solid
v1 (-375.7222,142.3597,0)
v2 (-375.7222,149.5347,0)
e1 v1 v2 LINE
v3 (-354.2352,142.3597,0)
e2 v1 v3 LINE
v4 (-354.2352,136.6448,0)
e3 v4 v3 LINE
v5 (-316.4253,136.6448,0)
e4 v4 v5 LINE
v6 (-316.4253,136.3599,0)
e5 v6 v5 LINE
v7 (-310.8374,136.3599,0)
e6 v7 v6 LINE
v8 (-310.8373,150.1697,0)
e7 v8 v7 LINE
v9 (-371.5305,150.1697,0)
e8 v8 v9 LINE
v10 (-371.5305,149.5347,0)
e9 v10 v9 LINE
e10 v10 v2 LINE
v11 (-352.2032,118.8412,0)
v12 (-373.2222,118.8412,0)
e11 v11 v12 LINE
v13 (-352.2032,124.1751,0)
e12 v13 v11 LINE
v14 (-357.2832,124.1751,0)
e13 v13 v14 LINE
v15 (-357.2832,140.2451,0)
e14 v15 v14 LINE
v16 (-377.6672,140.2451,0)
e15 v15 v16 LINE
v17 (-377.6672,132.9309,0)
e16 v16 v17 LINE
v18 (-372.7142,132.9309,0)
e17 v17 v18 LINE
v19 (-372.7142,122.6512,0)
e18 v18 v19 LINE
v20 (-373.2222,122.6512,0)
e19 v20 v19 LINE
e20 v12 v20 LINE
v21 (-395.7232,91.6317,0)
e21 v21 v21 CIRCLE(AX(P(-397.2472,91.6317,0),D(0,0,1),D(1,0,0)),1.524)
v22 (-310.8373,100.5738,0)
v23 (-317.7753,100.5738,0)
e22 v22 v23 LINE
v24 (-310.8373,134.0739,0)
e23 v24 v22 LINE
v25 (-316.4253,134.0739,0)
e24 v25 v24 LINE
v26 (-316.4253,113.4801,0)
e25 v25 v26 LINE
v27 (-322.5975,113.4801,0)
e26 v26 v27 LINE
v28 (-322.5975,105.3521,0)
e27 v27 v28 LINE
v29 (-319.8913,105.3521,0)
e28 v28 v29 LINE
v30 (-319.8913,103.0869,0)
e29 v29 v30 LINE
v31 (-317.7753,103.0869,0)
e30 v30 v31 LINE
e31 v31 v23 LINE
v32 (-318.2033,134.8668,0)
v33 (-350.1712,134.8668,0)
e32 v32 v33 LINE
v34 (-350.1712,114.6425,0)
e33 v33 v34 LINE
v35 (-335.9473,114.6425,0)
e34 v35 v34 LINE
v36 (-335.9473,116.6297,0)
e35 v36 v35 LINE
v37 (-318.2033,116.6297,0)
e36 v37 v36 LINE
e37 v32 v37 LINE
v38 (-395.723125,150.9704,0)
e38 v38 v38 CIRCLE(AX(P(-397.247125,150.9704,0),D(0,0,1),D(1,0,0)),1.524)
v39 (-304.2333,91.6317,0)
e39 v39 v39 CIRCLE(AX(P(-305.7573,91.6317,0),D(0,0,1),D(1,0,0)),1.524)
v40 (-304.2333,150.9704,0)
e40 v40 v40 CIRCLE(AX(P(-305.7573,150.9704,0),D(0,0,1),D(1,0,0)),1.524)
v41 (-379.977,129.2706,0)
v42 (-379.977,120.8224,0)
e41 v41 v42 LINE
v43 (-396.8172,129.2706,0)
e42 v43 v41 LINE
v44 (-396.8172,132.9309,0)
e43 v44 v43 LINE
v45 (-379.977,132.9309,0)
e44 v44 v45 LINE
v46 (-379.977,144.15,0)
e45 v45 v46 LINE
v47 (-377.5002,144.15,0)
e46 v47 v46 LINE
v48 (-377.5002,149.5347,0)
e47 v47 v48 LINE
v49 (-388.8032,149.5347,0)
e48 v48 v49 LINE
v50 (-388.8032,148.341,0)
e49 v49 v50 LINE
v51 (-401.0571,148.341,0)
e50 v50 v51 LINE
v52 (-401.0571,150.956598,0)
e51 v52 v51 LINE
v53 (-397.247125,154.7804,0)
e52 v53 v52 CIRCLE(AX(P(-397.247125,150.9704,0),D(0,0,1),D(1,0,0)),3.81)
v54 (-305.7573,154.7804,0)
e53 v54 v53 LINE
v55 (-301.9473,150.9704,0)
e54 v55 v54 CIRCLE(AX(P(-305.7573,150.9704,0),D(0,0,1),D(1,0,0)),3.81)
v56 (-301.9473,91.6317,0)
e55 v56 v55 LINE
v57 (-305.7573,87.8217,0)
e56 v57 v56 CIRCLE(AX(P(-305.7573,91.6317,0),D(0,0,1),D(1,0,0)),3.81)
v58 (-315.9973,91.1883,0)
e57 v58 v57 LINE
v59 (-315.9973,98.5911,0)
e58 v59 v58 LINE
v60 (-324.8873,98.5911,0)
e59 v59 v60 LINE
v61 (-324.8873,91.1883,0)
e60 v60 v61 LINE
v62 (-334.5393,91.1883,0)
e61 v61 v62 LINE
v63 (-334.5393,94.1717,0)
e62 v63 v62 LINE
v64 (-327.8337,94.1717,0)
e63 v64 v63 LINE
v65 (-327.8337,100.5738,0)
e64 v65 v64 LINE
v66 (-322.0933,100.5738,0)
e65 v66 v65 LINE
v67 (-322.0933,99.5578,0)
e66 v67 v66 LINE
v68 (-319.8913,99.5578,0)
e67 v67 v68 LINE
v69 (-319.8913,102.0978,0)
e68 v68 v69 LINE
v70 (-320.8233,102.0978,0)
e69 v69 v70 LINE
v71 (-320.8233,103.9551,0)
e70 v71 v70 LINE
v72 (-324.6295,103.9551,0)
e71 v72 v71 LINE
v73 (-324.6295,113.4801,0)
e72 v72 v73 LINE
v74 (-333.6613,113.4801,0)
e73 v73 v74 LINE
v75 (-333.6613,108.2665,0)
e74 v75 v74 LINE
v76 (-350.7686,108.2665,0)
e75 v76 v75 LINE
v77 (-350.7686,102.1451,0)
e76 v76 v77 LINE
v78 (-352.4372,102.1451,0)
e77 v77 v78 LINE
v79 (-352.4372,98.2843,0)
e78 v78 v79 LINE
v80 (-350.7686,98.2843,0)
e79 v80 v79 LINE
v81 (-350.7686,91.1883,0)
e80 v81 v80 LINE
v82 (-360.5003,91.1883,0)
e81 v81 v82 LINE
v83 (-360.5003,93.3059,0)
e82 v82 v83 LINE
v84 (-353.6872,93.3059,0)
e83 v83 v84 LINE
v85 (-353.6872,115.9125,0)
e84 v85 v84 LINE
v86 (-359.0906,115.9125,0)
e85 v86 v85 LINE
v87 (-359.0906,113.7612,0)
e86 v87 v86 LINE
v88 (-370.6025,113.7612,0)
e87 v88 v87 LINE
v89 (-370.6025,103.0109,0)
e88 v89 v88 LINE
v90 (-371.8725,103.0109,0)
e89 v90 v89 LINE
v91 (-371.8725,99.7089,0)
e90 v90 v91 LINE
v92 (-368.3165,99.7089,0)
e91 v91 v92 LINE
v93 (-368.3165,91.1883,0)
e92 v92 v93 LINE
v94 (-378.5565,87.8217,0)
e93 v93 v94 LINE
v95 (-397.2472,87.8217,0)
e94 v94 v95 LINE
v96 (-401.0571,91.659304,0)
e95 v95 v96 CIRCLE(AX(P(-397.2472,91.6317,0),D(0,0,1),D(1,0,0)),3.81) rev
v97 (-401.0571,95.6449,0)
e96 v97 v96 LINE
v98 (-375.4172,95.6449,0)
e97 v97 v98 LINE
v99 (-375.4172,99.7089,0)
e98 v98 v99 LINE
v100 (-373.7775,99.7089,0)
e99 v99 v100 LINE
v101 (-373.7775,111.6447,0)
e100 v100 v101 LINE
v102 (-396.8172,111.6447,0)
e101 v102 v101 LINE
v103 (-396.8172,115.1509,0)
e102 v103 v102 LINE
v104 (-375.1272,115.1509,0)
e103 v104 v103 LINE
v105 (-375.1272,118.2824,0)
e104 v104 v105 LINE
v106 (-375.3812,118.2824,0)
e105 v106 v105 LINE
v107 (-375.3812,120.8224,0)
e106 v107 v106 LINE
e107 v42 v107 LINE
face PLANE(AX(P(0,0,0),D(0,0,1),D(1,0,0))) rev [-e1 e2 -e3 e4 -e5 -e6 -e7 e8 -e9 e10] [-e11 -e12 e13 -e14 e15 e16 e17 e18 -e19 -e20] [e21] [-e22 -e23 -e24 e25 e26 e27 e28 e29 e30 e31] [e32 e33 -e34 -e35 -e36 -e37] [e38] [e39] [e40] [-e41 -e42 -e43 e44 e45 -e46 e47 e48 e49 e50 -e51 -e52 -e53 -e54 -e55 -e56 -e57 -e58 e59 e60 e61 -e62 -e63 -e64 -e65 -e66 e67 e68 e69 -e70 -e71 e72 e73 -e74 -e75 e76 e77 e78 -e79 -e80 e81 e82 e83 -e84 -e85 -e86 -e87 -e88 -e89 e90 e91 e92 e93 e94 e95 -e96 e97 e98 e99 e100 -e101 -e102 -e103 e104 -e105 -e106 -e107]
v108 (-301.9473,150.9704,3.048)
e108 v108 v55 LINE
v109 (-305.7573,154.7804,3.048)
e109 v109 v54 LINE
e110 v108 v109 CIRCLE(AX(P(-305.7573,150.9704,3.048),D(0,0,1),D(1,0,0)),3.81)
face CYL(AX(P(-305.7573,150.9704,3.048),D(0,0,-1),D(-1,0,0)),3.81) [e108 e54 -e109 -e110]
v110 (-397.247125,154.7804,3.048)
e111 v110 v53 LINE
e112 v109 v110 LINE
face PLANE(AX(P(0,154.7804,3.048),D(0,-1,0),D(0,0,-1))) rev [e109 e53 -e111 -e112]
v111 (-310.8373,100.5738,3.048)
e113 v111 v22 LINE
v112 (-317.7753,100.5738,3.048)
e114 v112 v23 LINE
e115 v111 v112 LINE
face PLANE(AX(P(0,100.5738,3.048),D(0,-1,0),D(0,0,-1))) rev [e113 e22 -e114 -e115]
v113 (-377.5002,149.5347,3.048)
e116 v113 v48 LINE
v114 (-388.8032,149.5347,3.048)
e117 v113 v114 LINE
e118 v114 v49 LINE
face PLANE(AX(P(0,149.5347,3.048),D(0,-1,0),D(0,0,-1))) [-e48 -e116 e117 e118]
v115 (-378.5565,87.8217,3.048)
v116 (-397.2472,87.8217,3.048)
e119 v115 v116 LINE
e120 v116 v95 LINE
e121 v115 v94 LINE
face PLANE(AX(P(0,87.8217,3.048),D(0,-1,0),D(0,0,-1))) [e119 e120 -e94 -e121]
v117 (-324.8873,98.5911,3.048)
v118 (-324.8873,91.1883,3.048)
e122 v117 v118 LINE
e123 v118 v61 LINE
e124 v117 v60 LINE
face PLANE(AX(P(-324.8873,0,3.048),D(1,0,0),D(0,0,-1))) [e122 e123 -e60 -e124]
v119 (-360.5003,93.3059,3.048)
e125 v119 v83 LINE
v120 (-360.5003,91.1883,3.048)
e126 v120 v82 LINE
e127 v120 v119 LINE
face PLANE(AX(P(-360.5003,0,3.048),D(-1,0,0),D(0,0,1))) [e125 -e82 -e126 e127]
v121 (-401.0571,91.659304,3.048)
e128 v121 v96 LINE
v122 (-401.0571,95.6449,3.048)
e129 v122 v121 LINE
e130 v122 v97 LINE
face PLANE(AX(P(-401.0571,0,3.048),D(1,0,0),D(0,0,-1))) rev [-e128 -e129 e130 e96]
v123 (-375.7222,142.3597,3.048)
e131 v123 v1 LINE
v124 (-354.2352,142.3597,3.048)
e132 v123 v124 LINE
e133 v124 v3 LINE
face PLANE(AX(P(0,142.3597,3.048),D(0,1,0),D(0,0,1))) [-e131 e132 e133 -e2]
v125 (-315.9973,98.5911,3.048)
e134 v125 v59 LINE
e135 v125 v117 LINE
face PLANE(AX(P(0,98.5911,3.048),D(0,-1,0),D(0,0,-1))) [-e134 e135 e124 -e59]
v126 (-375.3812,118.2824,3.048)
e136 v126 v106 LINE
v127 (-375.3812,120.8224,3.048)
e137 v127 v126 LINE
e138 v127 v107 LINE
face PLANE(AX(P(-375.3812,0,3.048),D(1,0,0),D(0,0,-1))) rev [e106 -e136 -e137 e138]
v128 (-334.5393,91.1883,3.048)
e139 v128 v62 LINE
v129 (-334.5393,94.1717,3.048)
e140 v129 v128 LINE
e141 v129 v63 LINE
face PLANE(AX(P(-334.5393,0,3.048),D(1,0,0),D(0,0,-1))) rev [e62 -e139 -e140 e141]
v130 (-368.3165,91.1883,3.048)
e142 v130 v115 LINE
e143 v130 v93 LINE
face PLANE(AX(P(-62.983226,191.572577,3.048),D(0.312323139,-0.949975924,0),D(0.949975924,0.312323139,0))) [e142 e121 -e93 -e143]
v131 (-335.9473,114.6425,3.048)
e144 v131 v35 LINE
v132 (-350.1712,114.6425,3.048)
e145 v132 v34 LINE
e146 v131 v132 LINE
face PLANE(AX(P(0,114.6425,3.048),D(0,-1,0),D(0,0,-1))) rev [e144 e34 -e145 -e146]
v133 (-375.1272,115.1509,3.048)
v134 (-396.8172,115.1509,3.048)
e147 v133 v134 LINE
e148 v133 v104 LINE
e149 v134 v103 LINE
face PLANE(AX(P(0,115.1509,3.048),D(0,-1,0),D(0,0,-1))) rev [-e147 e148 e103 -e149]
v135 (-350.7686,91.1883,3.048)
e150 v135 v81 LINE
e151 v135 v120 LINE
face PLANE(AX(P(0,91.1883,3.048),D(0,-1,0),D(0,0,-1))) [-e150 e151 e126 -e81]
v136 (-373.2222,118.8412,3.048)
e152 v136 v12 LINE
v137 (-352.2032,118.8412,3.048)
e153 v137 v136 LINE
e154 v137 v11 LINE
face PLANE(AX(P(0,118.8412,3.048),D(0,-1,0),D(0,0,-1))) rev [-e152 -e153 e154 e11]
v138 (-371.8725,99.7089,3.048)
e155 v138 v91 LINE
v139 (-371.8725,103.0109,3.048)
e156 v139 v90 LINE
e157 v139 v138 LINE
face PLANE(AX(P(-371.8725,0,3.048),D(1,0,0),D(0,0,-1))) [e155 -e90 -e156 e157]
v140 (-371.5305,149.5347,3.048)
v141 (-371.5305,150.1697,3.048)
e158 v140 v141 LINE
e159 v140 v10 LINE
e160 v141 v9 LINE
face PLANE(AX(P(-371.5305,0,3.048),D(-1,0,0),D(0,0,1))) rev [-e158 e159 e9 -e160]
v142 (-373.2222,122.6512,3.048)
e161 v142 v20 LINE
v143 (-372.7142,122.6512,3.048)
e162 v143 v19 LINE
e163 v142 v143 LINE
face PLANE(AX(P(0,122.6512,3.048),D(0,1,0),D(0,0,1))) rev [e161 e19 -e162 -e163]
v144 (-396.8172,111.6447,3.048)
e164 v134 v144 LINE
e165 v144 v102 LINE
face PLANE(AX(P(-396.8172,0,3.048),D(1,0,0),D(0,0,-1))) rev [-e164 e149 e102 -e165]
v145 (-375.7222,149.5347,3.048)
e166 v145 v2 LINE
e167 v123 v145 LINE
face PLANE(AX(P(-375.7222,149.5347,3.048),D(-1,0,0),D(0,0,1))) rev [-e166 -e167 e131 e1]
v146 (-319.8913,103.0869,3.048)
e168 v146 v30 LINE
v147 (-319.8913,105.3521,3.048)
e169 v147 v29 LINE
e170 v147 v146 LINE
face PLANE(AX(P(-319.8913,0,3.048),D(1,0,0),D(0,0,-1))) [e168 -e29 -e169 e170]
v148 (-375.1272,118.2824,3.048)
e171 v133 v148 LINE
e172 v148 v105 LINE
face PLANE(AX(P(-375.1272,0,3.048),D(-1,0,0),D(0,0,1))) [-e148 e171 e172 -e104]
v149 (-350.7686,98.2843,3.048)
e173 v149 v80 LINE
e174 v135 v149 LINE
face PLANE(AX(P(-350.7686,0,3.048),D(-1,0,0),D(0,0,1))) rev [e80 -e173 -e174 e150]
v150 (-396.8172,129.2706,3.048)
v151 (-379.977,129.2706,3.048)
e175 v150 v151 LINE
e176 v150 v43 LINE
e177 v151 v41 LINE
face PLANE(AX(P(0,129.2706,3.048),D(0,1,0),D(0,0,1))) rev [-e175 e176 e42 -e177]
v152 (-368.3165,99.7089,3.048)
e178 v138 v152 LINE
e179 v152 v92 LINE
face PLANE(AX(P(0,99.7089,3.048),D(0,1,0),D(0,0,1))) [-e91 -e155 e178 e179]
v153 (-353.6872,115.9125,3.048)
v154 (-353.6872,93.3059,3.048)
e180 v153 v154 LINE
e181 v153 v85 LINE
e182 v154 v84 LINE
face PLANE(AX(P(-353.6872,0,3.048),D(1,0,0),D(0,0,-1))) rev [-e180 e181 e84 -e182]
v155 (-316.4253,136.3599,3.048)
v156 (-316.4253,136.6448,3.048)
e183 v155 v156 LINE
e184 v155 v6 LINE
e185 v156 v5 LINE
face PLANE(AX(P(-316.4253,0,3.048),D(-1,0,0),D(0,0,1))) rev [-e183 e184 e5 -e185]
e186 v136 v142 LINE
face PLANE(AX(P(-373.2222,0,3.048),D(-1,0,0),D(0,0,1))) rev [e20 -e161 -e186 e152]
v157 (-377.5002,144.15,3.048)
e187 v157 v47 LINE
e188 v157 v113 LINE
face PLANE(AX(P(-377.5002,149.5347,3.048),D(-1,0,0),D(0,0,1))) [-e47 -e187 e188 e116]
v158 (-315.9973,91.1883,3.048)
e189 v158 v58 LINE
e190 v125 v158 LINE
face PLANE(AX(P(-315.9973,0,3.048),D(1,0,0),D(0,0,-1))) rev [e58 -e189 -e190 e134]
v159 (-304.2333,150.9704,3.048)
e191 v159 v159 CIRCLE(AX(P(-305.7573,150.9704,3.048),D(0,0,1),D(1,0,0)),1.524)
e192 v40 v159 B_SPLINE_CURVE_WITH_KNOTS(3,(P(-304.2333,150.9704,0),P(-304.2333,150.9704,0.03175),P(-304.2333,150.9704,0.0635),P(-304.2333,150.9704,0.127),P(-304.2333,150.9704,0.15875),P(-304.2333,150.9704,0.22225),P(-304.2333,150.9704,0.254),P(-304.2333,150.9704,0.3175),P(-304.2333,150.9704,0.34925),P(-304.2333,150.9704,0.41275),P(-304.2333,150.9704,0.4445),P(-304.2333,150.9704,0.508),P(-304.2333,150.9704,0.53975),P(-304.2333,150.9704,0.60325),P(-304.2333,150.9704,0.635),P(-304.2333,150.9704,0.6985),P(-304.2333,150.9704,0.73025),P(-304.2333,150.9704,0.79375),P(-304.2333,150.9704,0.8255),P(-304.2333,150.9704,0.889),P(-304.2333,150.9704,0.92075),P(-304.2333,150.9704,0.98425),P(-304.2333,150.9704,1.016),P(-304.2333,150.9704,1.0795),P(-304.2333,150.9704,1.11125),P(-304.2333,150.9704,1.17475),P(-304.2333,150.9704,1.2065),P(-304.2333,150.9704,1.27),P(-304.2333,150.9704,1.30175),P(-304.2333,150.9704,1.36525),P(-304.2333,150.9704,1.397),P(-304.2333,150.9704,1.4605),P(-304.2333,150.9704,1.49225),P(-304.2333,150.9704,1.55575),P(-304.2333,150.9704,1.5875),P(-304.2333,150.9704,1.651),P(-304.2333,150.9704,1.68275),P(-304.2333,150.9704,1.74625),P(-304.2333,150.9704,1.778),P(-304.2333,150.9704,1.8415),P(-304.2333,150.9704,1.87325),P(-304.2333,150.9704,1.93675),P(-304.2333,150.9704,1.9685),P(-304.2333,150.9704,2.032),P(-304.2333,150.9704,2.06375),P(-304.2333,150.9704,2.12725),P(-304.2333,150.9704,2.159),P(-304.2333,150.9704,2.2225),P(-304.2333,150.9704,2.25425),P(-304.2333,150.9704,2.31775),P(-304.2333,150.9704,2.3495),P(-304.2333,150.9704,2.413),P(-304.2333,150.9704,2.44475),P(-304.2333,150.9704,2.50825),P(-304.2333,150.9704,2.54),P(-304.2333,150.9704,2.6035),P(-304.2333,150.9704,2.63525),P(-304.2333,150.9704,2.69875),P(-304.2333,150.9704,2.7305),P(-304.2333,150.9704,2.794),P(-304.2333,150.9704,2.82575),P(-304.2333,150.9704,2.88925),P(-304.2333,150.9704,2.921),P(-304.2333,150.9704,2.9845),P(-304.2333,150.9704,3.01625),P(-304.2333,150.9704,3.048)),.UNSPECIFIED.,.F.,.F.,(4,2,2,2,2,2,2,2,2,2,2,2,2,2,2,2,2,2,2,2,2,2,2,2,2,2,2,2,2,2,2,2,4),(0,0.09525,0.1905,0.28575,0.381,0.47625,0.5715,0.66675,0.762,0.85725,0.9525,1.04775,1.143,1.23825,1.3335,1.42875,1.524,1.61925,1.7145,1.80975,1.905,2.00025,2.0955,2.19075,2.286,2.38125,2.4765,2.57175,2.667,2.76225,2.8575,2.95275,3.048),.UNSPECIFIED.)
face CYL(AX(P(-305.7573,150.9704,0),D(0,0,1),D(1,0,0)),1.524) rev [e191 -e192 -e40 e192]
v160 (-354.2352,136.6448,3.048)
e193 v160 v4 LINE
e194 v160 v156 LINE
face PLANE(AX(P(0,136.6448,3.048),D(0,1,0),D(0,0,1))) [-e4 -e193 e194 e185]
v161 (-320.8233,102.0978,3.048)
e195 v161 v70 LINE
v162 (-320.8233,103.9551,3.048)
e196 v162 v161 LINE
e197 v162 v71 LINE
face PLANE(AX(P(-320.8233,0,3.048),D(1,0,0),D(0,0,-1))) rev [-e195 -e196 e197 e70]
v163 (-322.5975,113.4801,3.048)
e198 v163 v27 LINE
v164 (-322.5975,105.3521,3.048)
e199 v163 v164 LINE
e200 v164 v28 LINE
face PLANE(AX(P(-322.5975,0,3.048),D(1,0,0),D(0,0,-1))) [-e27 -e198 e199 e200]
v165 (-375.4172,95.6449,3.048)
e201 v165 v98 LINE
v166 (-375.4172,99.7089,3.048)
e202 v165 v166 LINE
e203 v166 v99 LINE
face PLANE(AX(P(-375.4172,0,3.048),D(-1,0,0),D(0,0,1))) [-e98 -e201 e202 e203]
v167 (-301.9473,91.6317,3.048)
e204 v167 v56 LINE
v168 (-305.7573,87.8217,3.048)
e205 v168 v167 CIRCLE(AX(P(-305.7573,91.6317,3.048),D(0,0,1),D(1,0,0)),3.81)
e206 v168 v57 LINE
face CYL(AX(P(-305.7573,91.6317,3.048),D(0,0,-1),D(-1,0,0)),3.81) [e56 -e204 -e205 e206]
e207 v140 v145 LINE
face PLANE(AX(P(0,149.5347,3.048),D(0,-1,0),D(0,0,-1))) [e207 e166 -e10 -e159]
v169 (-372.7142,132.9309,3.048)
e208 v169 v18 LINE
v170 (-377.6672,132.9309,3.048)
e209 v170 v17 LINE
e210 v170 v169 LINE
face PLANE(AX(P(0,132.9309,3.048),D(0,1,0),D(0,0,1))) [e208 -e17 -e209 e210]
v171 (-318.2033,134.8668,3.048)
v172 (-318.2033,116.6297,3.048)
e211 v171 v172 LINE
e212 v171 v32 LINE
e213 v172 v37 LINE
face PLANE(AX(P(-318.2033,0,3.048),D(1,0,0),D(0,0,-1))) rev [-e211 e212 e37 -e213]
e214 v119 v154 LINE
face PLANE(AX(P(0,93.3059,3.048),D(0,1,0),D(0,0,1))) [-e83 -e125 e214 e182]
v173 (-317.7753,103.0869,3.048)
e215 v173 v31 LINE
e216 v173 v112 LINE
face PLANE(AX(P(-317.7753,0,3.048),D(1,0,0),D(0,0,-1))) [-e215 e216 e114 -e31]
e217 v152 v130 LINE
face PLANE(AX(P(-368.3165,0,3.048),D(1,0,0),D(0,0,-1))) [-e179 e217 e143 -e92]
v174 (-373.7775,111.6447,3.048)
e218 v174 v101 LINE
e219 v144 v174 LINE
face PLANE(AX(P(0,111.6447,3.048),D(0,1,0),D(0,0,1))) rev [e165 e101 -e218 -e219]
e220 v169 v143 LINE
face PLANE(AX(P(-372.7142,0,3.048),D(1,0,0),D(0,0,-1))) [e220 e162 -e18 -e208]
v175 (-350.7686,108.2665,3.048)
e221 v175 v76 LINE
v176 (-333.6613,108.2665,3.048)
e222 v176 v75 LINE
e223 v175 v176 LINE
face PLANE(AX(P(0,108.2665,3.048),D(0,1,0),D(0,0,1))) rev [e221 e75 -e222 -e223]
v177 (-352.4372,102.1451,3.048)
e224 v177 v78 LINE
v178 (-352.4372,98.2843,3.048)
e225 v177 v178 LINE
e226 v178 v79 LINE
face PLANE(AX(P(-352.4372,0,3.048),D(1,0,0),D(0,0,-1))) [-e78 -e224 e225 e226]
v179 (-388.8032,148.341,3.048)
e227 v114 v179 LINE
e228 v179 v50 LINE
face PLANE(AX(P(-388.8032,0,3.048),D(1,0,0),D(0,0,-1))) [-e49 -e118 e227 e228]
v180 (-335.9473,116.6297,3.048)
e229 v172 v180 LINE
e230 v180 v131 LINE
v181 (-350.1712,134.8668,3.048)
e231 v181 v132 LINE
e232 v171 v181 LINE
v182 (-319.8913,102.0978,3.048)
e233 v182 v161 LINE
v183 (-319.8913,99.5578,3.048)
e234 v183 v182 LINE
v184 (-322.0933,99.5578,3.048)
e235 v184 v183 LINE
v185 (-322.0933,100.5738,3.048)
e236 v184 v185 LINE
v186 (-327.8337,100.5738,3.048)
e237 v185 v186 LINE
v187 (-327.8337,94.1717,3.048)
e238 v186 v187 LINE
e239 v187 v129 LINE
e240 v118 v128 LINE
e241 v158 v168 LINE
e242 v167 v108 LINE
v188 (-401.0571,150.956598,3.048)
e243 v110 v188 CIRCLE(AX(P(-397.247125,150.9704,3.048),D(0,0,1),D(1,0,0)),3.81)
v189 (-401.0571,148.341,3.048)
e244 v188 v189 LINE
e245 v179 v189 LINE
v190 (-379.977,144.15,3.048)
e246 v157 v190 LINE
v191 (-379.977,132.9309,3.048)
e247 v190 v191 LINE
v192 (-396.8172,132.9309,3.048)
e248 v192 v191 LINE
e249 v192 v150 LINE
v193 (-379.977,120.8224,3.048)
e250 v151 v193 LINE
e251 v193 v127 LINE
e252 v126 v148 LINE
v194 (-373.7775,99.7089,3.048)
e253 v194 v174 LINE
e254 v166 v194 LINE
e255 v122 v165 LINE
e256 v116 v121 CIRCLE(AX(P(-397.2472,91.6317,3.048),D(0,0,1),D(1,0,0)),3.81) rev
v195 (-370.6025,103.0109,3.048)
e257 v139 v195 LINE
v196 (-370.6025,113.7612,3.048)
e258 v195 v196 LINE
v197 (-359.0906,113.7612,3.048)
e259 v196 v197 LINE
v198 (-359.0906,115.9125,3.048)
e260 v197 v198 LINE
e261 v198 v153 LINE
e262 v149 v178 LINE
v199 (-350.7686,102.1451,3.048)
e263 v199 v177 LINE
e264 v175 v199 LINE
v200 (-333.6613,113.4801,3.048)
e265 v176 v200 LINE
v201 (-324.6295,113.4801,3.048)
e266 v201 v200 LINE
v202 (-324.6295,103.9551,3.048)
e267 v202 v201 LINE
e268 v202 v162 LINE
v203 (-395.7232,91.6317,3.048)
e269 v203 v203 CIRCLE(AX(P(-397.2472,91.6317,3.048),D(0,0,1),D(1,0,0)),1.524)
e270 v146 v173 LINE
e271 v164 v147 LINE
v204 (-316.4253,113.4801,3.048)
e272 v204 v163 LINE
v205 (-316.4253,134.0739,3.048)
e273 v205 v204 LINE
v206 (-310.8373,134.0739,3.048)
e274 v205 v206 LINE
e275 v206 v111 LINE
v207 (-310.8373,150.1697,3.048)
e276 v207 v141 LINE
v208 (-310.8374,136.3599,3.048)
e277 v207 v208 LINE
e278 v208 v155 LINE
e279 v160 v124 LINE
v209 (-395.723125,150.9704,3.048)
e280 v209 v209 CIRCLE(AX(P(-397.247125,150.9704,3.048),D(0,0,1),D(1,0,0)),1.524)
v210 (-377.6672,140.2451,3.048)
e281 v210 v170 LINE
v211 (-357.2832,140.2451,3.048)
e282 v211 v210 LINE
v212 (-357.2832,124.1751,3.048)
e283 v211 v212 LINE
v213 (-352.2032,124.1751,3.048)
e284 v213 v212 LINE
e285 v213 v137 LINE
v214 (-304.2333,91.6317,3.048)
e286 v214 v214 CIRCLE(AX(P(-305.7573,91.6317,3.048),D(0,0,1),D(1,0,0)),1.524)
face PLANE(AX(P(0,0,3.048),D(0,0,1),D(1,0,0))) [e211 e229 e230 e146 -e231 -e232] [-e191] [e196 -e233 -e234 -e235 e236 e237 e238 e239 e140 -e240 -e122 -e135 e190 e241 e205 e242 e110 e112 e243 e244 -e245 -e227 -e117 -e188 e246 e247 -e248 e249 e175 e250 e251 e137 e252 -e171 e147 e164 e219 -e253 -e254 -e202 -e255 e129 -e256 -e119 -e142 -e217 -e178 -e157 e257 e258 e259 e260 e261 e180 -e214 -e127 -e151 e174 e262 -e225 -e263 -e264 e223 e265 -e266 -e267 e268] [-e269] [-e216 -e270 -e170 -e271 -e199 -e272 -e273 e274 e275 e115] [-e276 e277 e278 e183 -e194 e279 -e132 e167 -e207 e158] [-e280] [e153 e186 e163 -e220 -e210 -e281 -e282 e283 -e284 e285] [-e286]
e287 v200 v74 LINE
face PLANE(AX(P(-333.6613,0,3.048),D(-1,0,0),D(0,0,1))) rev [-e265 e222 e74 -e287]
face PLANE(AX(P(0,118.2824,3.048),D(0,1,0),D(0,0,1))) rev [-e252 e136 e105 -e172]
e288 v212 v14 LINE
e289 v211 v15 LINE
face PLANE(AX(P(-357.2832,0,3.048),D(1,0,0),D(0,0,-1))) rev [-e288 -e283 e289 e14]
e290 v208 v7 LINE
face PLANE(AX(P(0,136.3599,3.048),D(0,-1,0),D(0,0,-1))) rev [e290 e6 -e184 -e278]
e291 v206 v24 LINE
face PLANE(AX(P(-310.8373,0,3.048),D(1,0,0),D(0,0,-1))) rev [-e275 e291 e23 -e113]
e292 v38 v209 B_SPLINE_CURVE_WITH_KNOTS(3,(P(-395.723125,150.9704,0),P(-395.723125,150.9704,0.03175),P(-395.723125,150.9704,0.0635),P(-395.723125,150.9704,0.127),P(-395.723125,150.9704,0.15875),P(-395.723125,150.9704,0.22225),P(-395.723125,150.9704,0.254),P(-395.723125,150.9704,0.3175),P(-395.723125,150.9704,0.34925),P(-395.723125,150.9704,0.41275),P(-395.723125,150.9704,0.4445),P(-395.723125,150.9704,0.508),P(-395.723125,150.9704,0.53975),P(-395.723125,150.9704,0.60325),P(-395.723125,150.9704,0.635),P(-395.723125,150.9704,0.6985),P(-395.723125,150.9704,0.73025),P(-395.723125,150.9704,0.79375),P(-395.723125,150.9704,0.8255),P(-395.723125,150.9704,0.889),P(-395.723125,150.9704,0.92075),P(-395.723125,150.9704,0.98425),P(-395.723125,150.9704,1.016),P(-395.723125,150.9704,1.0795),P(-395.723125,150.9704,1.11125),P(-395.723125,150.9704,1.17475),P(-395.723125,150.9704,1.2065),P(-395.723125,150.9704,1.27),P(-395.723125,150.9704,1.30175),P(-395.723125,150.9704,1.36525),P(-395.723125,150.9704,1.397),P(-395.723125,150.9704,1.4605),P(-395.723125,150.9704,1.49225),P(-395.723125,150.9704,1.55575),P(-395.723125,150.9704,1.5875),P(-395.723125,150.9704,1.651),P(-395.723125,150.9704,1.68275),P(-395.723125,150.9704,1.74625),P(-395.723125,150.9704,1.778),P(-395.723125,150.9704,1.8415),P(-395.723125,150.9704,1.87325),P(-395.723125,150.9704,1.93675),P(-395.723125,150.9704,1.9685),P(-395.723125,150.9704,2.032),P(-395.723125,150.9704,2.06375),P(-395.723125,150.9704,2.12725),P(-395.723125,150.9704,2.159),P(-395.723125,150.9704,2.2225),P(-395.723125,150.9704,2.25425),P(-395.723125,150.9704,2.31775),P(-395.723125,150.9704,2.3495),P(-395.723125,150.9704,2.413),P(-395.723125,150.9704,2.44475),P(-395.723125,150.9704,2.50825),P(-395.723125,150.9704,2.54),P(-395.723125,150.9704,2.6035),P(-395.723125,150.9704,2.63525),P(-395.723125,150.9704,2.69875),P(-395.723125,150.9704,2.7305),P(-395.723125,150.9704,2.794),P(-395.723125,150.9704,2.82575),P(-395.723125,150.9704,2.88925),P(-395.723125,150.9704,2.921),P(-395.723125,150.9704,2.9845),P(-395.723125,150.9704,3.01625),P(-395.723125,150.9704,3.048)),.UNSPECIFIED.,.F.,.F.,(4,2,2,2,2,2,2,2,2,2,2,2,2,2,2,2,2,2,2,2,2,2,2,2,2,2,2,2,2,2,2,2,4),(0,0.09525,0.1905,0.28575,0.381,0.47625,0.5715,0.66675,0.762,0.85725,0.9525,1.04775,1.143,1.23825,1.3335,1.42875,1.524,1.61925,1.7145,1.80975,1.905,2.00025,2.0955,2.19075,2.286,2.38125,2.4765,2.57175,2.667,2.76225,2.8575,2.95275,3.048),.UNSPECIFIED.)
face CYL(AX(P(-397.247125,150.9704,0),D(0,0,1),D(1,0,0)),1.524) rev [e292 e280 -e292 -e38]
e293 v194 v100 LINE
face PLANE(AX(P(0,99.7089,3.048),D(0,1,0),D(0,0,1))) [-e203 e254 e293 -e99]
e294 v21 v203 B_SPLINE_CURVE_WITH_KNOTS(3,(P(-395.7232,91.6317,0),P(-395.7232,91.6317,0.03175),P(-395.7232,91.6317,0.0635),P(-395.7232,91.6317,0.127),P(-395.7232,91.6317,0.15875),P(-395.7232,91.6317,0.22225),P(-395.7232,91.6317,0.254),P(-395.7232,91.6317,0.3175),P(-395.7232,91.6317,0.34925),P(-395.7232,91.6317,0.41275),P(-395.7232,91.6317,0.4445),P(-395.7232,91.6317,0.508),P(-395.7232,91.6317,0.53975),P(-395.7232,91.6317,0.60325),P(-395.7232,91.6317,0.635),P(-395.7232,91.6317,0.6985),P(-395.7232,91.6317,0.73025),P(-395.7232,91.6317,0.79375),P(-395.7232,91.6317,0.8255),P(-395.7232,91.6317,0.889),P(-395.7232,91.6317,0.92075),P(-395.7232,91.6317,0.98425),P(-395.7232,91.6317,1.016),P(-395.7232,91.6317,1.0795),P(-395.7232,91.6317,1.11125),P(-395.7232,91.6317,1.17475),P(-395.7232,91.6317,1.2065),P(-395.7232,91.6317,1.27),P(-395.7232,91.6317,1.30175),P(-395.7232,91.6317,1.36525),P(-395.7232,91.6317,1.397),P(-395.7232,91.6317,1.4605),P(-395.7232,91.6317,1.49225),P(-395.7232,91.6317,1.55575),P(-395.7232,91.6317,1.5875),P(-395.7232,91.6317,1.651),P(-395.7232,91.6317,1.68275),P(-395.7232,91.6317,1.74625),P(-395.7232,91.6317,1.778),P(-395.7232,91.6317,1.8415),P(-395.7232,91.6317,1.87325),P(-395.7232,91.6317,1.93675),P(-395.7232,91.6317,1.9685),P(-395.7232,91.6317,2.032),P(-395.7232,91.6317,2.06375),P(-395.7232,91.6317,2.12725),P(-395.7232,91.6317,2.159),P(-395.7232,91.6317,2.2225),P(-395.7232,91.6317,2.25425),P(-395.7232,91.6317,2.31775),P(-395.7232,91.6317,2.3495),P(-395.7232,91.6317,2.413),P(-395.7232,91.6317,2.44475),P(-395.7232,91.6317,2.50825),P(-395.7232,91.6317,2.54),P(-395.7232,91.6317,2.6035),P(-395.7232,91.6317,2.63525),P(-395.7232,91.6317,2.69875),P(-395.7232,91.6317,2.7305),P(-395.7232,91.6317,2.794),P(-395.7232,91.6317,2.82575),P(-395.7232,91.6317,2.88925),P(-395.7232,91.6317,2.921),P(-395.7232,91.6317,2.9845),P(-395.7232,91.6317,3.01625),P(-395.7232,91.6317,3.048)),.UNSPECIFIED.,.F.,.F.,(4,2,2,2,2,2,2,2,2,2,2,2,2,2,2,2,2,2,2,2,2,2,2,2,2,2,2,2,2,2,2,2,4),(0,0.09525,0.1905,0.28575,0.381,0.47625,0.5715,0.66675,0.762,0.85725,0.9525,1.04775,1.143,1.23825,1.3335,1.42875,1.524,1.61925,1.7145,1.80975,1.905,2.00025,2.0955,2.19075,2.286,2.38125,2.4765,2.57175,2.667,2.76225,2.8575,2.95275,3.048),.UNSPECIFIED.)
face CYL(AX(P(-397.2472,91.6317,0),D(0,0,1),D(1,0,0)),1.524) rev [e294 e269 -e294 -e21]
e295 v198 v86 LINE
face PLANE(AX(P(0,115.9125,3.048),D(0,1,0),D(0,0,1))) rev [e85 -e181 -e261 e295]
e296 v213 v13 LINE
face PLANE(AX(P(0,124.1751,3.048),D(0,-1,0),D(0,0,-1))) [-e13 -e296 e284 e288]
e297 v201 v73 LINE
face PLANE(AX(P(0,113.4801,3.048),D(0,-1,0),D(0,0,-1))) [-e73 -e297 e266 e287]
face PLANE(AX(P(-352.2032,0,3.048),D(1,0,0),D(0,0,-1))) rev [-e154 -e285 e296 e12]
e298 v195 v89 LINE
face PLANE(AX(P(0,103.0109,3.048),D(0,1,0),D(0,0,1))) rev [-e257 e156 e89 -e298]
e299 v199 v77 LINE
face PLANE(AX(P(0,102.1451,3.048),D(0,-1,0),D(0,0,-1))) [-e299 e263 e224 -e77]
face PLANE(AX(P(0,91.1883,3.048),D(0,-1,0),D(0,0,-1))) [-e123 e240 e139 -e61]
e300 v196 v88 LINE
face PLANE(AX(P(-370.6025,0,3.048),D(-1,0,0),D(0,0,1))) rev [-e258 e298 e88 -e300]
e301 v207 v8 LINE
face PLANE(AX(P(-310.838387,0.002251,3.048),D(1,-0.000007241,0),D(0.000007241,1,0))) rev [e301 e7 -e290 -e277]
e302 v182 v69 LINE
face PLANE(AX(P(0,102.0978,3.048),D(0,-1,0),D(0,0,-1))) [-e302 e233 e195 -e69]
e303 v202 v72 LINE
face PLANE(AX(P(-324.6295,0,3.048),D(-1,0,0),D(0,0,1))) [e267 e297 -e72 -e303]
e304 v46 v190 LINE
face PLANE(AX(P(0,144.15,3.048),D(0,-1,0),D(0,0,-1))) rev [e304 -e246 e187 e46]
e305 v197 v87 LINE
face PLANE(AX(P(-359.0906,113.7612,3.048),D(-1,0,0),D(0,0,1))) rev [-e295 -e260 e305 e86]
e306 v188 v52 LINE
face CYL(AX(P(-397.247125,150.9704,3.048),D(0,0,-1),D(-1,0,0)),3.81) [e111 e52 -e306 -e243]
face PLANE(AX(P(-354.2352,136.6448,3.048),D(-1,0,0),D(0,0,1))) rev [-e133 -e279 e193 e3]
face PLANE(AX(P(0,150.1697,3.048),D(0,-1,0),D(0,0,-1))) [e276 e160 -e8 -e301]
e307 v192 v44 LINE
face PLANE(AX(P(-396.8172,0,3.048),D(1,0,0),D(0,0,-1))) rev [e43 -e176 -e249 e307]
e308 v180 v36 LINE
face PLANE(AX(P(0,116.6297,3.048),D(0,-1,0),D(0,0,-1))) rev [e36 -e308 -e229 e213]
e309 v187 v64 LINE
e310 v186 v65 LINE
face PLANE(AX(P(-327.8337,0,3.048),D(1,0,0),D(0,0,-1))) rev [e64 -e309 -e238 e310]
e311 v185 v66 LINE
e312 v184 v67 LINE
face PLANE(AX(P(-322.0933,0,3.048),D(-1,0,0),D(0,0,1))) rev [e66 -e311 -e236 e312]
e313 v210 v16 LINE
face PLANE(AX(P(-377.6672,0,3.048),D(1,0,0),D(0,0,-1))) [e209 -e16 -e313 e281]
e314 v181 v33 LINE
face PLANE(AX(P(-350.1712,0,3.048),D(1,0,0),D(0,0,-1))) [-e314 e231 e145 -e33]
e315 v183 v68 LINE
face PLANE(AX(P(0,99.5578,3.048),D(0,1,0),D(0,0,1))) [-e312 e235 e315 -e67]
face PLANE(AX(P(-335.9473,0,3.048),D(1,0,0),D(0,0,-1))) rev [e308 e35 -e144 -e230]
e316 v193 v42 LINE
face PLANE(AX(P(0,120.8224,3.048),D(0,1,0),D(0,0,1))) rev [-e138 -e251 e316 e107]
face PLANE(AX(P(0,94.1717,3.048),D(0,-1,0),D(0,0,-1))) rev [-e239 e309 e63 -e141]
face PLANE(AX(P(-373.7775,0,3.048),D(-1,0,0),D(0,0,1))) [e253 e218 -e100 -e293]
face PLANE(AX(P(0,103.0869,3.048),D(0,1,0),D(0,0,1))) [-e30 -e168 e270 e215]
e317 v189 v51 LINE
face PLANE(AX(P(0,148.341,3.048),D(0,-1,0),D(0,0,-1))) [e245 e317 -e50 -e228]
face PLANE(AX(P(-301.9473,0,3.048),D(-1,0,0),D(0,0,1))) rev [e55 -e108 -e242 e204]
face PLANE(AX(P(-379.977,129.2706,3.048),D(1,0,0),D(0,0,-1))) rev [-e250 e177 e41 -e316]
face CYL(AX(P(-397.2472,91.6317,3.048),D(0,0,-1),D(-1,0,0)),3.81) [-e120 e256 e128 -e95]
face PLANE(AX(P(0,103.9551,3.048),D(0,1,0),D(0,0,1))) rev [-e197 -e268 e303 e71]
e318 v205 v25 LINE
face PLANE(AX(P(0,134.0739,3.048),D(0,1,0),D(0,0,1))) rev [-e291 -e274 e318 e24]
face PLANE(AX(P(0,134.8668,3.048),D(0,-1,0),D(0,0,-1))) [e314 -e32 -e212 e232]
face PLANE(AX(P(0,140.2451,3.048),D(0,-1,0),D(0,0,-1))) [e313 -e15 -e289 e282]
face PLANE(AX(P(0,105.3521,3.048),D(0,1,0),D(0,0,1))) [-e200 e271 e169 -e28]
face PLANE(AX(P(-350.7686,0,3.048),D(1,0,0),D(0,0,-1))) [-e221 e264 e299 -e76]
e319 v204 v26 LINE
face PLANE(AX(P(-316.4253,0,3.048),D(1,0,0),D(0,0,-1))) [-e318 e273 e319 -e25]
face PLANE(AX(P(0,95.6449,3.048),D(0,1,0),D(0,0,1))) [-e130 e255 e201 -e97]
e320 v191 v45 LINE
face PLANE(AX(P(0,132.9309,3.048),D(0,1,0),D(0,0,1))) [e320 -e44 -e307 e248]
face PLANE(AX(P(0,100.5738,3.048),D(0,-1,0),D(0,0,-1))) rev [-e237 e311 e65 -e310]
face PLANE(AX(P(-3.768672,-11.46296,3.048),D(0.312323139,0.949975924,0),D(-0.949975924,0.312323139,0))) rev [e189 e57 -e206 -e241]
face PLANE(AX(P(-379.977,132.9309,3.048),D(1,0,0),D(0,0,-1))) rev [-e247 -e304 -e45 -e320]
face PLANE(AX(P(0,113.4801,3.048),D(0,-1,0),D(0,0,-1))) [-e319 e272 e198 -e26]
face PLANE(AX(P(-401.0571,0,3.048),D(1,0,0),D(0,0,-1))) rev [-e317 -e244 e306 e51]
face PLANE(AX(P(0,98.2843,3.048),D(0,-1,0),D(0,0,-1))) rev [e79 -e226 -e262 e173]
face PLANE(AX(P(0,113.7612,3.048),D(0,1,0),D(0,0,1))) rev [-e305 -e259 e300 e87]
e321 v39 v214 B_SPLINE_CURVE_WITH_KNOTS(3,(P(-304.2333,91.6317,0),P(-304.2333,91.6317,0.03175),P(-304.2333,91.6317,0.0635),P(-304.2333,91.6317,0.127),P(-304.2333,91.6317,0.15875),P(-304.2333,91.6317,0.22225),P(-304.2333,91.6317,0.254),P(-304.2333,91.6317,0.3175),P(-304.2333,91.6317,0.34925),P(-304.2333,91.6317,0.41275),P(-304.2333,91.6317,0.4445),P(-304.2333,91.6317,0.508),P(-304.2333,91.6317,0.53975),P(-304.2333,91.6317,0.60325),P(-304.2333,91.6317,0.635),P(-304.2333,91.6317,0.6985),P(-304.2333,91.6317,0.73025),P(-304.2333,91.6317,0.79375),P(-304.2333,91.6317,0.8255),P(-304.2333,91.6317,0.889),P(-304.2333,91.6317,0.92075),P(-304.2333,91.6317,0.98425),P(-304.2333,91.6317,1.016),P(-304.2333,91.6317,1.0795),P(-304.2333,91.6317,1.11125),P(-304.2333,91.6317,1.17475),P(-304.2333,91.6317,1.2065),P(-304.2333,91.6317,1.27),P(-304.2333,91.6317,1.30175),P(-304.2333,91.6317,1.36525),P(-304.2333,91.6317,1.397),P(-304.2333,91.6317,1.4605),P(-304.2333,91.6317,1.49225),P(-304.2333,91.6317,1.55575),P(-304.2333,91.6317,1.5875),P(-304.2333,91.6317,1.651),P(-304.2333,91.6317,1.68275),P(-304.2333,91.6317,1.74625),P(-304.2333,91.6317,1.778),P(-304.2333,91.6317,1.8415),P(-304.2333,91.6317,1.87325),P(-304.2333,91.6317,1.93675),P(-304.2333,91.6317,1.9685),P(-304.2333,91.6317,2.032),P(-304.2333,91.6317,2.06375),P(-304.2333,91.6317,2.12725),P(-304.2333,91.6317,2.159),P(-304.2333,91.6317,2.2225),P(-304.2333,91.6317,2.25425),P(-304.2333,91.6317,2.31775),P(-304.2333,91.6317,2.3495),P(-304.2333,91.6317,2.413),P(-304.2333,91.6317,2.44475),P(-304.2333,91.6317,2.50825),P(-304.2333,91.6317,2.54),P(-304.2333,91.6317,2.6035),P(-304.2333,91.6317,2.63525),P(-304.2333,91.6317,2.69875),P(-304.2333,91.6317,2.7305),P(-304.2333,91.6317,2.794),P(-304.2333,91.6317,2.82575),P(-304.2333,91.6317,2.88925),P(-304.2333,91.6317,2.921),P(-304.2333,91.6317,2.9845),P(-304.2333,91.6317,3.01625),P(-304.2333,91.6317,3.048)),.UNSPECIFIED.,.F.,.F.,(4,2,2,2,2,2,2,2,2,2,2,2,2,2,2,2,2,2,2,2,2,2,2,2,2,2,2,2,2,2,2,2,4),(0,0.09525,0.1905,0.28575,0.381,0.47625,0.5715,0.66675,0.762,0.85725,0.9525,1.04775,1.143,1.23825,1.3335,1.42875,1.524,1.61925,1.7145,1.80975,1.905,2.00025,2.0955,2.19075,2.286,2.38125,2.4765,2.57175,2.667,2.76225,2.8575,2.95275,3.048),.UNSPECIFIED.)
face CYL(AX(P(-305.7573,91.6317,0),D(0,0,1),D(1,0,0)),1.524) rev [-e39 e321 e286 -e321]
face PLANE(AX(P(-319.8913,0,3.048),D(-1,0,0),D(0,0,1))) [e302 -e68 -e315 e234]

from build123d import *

# Parameters (mm, degrees)
BOSS_EXTRUDE1_OUTLINE_R = 1.3462
BOSS_EXTRUDE1_DEPTH     = 3.048
SKETCH14_W              = 2.2754
SKETCH14_H              = 2.1513
CUT_EXTRUDE2_DEPTH      = 430.898988368
SKETCH15_W              = 16.8402
SKETCH15_H              = 14.1197
SKETCH15_H_2            = 15.4101
CUT_EXTRUDE3_DEPTH      = 430.898988368
SKETCH16_R              = 1.524
CUT_EXTRUDE4_DEPTH      = 430.898988368
SKETCH17_W              = 13.7159
SKETCH17_H              = 5.7149
SKETCH17_W_2            = 4.1917
SKETCH17_H_2            = 7.175
CUT_EXTRUDE5_DEPTH      = 430.898988368
SKETCH18_W              = 1.778
SKETCH18_H              = 5.3847
BOSS_EXTRUDE9_DEPTH     = 3.048


# Read off the part's stored shape, not the designer's step: Boss-Extrude1
with BuildPart() as part:
    # Boss-Extrude1 outline → Boss-Extrude1 (new body)
    with BuildSketch(Plane.XY):
        with BuildLine():
            ThreePointArc((-397.247125, 154.7804), (-399.946077222, 153.659592612), (-401.0571, 150.956597849))
            Line((-401.0571, 150.956597849), (-401.0571, 148.341))
            Line((-401.0571, 148.341), (-388.8032, 148.341))
            Line((-388.8032, 148.341), (-388.8032, 149.5347))
            Line((-388.8032, 149.5347), (-375.7222, 149.5347))
            Line((-375.7222, 149.5347), (-375.7222, 144.15))
            Line((-375.7222, 144.15), (-380.1672, 144.15))
            Line((-380.1672, 144.15), (-380.1672, 132.9309))
            Line((-380.1672, 132.9309), (-396.8172, 132.9309))
            Line((-396.8172, 132.9309), (-396.8172, 129.2706))
            Line((-396.8172, 129.2706), (-380.1672, 129.2706))
            Line((-380.1672, 129.2706), (-380.1672, 120.8224))
            Line((-380.1672, 120.8224), (-375.3812, 120.8224))
            Line((-375.3812, 120.8224), (-375.3812, 118.2824))
            Line((-375.3812, 118.2824), (-375.1272, 118.2824))
            Line((-375.1272, 118.2824), (-375.1272, 115.1509))
            Line((-375.1272, 115.1509), (-396.8172, 115.1509))
            Line((-396.8172, 115.1509), (-396.8172, 111.6447))
            Line((-396.8172, 111.6447), (-373.7775, 111.6447))
            Line((-373.7775, 111.6447), (-373.7775, 99.7089))
            Line((-373.7775, 99.7089), (-375.4172, 99.7089))
            Line((-375.4172, 99.7089), (-375.4172, 95.6449))
            Line((-375.4172, 95.6449), (-401.0571, 95.6449))
            Line((-401.0571, 95.6449), (-401.0571, 91.659304166))
            ThreePointArc((-401.0571, 91.659304166), (-399.951018769, 88.947400452), (-397.2472, 87.8217))
            Line((-397.2472, 87.8217), (-378.5565, 87.8217))
            Line((-378.5565, 87.8217), (-368.3165, 91.1883))
            Line((-368.3165, 91.1883), (-368.3165, 99.7089))
            Line((-368.3165, 99.7089), (-371.8725, 99.7089))
            Line((-371.8725, 99.7089), (-371.8725, 103.0109))
            Line((-371.8725, 103.0109), (-370.6025, 103.0109))
            Line((-370.6025, 103.0109), (-370.6025, 113.7612))
            Line((-370.6025, 113.7612), (-356.8152, 113.7612))
            Line((-356.8152, 113.7612), (-356.8152, 115.9125))
            Line((-356.8152, 115.9125), (-353.6872, 115.9125))
            Line((-353.6872, 115.9125), (-353.6872, 93.3059))
            Line((-353.6872, 93.3059), (-360.5003, 93.3059))
            Line((-360.5003, 93.3059), (-360.5003, 91.1883))
            Line((-360.5003, 91.1883), (-350.7686, 91.1883))
            Line((-350.7686, 91.1883), (-350.7686, 98.2843))
            Line((-350.7686, 98.2843), (-352.4372, 98.2843))
            Line((-352.4372, 98.2843), (-352.4372, 102.1451))
            Line((-352.4372, 102.1451), (-350.7686, 102.1451))
            Line((-350.7686, 102.1451), (-350.7686, 108.2665))
            Line((-350.7686, 108.2665), (-333.6613, 108.2665))
            Line((-333.6613, 108.2665), (-333.6613, 113.4801))
            Line((-333.6613, 113.4801), (-324.6295, 113.4801))
            Line((-324.6295, 113.4801), (-324.6295, 103.9551))
            Line((-324.6295, 103.9551), (-320.8233, 103.9551))
            Line((-320.8233, 103.9551), (-320.8233, 102.0978))
            Line((-320.8233, 102.0978), (-319.8913, 102.0978))
            Line((-319.8913, 102.0978), (-319.8913, 99.5578))
            Line((-319.8913, 99.5578), (-322.0933, 99.5578))
            Line((-322.0933, 99.5578), (-322.0933, 100.5738))
            Line((-322.0933, 100.5738), (-327.8337, 100.5738))
            Line((-327.8337, 100.5738), (-327.8337, 94.1717))
            Line((-327.8337, 94.1717), (-334.5393, 94.1717))
            Line((-334.5393, 94.1717), (-334.5393, 91.1883))
            Line((-334.5393, 91.1883), (-324.8873, 91.1883))
            Line((-324.8873, 91.1883), (-324.8873, 98.5911))
            Line((-324.8873, 98.5911), (-315.9973, 98.5911))
            Line((-315.9973, 98.5911), (-315.9973, 91.1883))
            Line((-315.9973, 91.1883), (-305.7573, 87.8217))
            ThreePointArc((-305.7573, 87.8217), (-303.063223164, 88.937623164), (-301.9473, 91.6317))
            Line((-301.9473, 91.6317), (-301.9473, 150.9704))
            ThreePointArc((-301.9473, 150.9704), (-303.063223164, 153.664476836), (-305.7573, 154.7804))
            Line((-305.7573, 154.7804), (-397.247125, 154.7804))
        make_face()
        with Locations((-397.2472, 91.6317)):
            Circle(BOSS_EXTRUDE1_OUTLINE_R, mode=Mode.SUBTRACT)
        with Locations((-305.7573, 91.6317)):
            Circle(BOSS_EXTRUDE1_OUTLINE_R, mode=Mode.SUBTRACT)
        Polygon((-322.5975, 105.3521), (-322.5975, 113.4801), (-316.4253, 113.4801), (-316.4253, 134.0739), (-310.8373, 134.0739), (-310.8373, 100.5738), (-317.7753, 100.5738), (-317.7753, 103.0869), (-319.8913, 103.0869), (-319.8913, 105.3521), align=None, mode=Mode.SUBTRACT)
        Polygon((-372.7142, 122.6512), (-372.7142, 132.9309), (-377.6672, 132.9309), (-377.6672, 140.2451), (-357.2832, 140.2451), (-357.2832, 124.1751), (-352.2032, 124.1751), (-352.2032, 118.8412), (-373.2222, 118.8412), (-373.2222, 122.6512), align=None, mode=Mode.SUBTRACT)
        with Locations((-397.247125, 150.9704)):
            Circle(BOSS_EXTRUDE1_OUTLINE_R, mode=Mode.SUBTRACT)
        Polygon((-335.9473, 116.6297), (-335.9473, 114.6425), (-350.1712, 114.6425), (-350.1712, 134.8668), (-318.2033, 134.8668), (-318.2033, 116.6297), align=None, mode=Mode.SUBTRACT)
        Polygon((-310.8374, 136.3599), (-316.4253, 136.3599), (-316.4253, 136.6448), (-340.5193, 136.6448), (-340.5193, 142.3597), (-371.5305, 142.3597), (-371.5305, 150.1697), (-310.8373, 150.1697), align=None, mode=Mode.SUBTRACT)
        with Locations((-305.7573, 150.9704)):
            Circle(BOSS_EXTRUDE1_OUTLINE_R, mode=Mode.SUBTRACT)
    extrude(amount=BOSS_EXTRUDE1_DEPTH)

    # Sketch14 → Cut-Extrude2 (cut, through all)
    with BuildSketch(Plane(origin=(0, 0, 0), x_dir=(-1, 0, 0), z_dir=(0, 0, -1))):
        with Locations((357.9529, 114.83685)):
            Rectangle(SKETCH14_W, SKETCH14_H)
    extrude(amount=-CUT_EXTRUDE2_DEPTH, mode=Mode.SUBTRACT)

    # Sketch15 → Cut-Extrude3 (cut, through all)
    with BuildSketch(Plane(origin=(0, 0, 0), x_dir=(-1, 0, 0), z_dir=(0, 0, -1))):
        with Locations((388.3971, 122.21075)):
            Rectangle(SKETCH15_W, SKETCH15_H)
        with Locations((388.3971, 140.63595)):
            Rectangle(SKETCH15_W, SKETCH15_H_2)
    extrude(amount=-CUT_EXTRUDE3_DEPTH, mode=Mode.SUBTRACT)

    # Sketch16 → Cut-Extrude4 (cut, through all)
    with BuildSketch(Plane.XY.offset(3.048)):
        with Locations((-397.247125, 150.9704)):
            Circle(SKETCH16_R)
        with Locations((-305.7573, 150.9704)):
            Circle(SKETCH16_R)
        with Locations((-305.7573, 91.6317)):
            Circle(SKETCH16_R)
        with Locations((-397.2472, 91.6317)):
            Circle(SKETCH16_R)
    extrude(amount=-CUT_EXTRUDE4_DEPTH, mode=Mode.SUBTRACT)

    # Sketch17 → Cut-Extrude5 (cut, through all)
    with BuildSketch(Plane(origin=(0, 0, 0), x_dir=(-1, 0, 0), z_dir=(0, 0, -1))):
        with Locations((347.37725, 139.50225)):
            Rectangle(SKETCH17_W, SKETCH17_H)
        with Locations((373.62635, 145.9472)):
            Rectangle(SKETCH17_W_2, SKETCH17_H_2)
    extrude(amount=-CUT_EXTRUDE5_DEPTH, mode=Mode.SUBTRACT)

    # Sketch18 → Boss-Extrude9 (add)
    with BuildSketch(Plane(origin=(0, 0, 0), x_dir=(-1, 0, 0), z_dir=(0, 0, -1))):
        with Locations((376.6112, 146.84235)):
            Rectangle(SKETCH18_W, SKETCH18_H)
    extrude(amount=-BOSS_EXTRUDE9_DEPTH)


solid = part.part
